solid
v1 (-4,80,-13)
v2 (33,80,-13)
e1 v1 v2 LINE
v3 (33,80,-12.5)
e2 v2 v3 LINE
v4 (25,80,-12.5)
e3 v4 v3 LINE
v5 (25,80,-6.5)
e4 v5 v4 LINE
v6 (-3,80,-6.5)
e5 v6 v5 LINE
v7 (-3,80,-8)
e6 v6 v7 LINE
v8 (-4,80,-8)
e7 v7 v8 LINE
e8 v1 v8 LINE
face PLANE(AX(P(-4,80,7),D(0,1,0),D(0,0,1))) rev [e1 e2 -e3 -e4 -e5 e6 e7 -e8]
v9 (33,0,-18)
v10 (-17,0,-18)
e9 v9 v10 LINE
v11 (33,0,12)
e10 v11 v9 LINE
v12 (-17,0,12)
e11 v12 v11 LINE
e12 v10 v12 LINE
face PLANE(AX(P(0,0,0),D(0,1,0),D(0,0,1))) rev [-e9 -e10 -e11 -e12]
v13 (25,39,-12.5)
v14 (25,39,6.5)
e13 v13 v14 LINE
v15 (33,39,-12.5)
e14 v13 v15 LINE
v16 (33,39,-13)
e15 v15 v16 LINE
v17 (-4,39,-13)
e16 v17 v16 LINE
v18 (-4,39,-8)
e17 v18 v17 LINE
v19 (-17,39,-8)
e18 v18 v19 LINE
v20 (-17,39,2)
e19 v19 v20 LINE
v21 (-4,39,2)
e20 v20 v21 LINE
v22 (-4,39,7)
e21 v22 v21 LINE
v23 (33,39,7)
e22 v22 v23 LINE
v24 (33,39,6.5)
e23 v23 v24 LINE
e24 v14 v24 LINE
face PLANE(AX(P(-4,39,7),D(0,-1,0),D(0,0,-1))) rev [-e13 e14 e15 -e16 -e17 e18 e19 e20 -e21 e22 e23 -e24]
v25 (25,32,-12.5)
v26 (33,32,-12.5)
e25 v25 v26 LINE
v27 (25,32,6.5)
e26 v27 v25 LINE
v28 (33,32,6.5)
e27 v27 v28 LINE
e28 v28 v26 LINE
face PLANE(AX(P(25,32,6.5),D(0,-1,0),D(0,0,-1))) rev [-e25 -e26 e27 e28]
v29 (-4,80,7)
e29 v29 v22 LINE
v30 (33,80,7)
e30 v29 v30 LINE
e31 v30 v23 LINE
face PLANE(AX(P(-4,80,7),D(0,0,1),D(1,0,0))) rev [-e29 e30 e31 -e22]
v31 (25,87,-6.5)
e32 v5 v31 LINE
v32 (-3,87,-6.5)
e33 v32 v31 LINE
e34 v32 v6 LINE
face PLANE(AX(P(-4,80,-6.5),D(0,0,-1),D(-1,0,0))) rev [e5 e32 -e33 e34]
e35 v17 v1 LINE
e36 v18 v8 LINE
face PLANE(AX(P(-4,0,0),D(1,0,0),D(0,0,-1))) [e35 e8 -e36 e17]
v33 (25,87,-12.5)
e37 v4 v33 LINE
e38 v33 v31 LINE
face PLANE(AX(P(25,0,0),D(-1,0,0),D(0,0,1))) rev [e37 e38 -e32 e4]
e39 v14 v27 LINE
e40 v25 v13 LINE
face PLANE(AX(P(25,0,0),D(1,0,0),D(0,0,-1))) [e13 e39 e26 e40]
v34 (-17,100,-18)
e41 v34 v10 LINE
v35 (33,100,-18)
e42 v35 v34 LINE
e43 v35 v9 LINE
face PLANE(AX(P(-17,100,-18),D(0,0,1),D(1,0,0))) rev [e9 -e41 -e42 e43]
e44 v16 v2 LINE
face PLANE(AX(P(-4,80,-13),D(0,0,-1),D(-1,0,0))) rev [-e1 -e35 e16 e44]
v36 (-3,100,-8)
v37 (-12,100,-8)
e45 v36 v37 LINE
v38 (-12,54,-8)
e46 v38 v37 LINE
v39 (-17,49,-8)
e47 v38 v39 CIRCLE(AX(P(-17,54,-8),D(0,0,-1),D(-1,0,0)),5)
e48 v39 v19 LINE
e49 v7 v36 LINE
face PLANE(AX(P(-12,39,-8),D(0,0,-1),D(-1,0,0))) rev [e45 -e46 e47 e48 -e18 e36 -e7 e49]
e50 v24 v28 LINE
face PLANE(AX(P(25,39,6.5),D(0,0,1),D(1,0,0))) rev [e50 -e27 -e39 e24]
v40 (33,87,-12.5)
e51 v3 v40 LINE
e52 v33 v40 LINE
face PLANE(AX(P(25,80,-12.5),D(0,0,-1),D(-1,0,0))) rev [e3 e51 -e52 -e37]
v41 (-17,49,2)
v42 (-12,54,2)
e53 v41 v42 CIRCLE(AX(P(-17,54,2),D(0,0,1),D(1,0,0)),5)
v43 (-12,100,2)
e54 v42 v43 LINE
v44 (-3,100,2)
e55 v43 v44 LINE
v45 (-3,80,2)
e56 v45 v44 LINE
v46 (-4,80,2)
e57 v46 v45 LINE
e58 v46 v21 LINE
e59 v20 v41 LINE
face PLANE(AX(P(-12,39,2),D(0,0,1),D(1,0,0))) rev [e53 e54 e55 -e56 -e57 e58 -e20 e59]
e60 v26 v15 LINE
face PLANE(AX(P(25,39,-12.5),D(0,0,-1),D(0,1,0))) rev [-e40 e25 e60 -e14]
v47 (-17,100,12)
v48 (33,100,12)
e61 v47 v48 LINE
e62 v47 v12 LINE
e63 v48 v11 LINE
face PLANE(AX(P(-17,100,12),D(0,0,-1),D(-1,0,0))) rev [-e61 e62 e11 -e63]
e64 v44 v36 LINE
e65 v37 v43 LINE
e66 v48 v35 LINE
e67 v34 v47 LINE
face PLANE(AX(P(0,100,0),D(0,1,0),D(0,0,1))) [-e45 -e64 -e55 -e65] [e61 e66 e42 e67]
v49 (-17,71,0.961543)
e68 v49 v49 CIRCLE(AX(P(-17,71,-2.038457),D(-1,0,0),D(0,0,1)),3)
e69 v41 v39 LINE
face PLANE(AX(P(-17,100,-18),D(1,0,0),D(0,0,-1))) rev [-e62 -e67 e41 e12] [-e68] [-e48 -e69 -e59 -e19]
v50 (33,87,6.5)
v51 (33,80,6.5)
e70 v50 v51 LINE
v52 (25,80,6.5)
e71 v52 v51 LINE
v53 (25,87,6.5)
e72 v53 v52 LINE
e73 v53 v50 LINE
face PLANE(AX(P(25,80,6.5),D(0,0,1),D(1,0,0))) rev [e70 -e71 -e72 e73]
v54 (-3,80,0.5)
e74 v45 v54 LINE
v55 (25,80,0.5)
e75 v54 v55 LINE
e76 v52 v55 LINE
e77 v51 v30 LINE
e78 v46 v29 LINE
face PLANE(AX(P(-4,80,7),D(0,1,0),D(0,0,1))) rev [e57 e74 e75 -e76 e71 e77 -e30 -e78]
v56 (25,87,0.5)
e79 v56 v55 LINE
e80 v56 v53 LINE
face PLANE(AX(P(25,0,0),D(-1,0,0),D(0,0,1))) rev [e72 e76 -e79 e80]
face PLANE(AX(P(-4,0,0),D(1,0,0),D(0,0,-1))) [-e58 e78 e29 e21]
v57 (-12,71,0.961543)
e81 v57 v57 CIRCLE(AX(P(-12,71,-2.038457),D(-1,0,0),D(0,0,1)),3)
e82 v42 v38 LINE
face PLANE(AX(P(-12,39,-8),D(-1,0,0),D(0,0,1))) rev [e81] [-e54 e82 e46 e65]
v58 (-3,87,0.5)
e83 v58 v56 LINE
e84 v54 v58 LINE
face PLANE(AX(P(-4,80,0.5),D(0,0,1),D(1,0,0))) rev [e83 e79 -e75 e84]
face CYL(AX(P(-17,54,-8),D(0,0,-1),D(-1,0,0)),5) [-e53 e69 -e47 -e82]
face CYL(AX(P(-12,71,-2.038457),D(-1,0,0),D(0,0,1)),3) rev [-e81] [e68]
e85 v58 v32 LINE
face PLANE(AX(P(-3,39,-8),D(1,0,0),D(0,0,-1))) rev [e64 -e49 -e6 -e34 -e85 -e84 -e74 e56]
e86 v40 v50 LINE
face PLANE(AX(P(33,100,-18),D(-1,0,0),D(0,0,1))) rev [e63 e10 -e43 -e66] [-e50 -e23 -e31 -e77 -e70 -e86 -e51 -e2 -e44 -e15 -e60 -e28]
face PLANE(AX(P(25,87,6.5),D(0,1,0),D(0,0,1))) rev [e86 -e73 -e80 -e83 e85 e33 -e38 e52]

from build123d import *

# Parameters (mm, degrees)
SKETCH_3_W          = 50
SKETCH_3_H          = 30
EXTRUDE_1_DEPTH     = 100
SKETCH_4_W          = 20
SKETCH_4_H          = 41
CUT_EXTRUDE_1_DEPTH = 37
SKETCH_5_W          = 19
SKETCH_5_H          = 7
CUT_EXTRUDE_2_DEPTH = 8
SKETCH_6_W          = 7
SKETCH_6_H          = 7
CUT_EXTRUDE_3_DEPTH = 29
SKETCH_8_W          = 9
SKETCH_8_H          = 10
CUT_EXTRUDE_4_DEPTH = 61
SKETCH_9_W          = 10
SKETCH_9_H          = 10
CUT_EXTRUDE_5_DEPTH = 5
FILLET_1_R          = 5
SKETCH_10_R         = 3
CUT_EXTRUDE_6_DEPTH = 5


with BuildPart() as part:
    # 草圖3 → 填料-伸長1 (new body)
    with BuildSketch(Plane(origin=(0, 0, 0), x_dir=(1, 0, 0), z_dir=(0, 1, 0))):
        with Locations((8, 3)):
            Rectangle(SKETCH_3_W, SKETCH_3_H)
    extrude(amount=EXTRUDE_1_DEPTH)

    # 草圖4 → 除料-伸長1 (cut)
    with BuildSketch(Plane(origin=(33, 0, 0), x_dir=(0, 0, -1), z_dir=(1, 0, 0))):
        with Locations((3, 59.5)):
            Rectangle(SKETCH_4_W, SKETCH_4_H)
    extrude(amount=-CUT_EXTRUDE_1_DEPTH, mode=Mode.SUBTRACT)

    # 草圖5 → 除料-伸長2 (cut)
    with BuildSketch(Plane(origin=(33, 0, 0), x_dir=(0, 0, -1), z_dir=(1, 0, 0))):
        with Locations((3, 83.5)):
            Rectangle(SKETCH_5_W, SKETCH_5_H)
        with Locations((3, 35.5)):
            Rectangle(SKETCH_5_W, SKETCH_5_H)
    extrude(amount=-CUT_EXTRUDE_2_DEPTH, mode=Mode.SUBTRACT)

    # 草圖6 → 除料-伸長3 (cut)
    with BuildSketch(Plane(origin=(25, 0, 0), x_dir=(0, 0, -1), z_dir=(1, 0, 0))):
        with Locations((3, 83.5)):
            Rectangle(SKETCH_6_W, SKETCH_6_H)
    extrude(amount=-CUT_EXTRUDE_3_DEPTH, mode=Mode.SUBTRACT)

    # 草圖8 → 除料-伸長4 (cut)
    with BuildSketch(Plane(origin=(0, 100, 0), x_dir=(1, 0, 0), z_dir=(0, 1, 0))):
        with Locations((-7.5, 3)):
            Rectangle(SKETCH_8_W, SKETCH_8_H)
    extrude(amount=-CUT_EXTRUDE_4_DEPTH, mode=Mode.SUBTRACT)

    # 草圖9 → 除料-伸長5 (cut)
    with BuildSketch(Plane.ZY.offset(17)):
        with Locations((-3, 44)):
            Rectangle(SKETCH_9_W, SKETCH_9_H)
    extrude(amount=-CUT_EXTRUDE_5_DEPTH, mode=Mode.SUBTRACT)

    # 圓角1
    fillet_1_edges = [part.edges().sort_by_distance(p)[0] for p in [
        (-12, 49, -3),
    ]]
    fillet(fillet_1_edges, radius=FILLET_1_R - 0.0001)  # a hair under: the kernel refuses the full size

    # 草圖10 → 除料-伸長6 (cut)
    with BuildSketch(Plane.ZY.offset(17)):
        with Locations((-2.038456717, 71)):
            Circle(SKETCH_10_R)
    extrude(amount=-CUT_EXTRUDE_6_DEPTH, mode=Mode.SUBTRACT)


solid = part.part
